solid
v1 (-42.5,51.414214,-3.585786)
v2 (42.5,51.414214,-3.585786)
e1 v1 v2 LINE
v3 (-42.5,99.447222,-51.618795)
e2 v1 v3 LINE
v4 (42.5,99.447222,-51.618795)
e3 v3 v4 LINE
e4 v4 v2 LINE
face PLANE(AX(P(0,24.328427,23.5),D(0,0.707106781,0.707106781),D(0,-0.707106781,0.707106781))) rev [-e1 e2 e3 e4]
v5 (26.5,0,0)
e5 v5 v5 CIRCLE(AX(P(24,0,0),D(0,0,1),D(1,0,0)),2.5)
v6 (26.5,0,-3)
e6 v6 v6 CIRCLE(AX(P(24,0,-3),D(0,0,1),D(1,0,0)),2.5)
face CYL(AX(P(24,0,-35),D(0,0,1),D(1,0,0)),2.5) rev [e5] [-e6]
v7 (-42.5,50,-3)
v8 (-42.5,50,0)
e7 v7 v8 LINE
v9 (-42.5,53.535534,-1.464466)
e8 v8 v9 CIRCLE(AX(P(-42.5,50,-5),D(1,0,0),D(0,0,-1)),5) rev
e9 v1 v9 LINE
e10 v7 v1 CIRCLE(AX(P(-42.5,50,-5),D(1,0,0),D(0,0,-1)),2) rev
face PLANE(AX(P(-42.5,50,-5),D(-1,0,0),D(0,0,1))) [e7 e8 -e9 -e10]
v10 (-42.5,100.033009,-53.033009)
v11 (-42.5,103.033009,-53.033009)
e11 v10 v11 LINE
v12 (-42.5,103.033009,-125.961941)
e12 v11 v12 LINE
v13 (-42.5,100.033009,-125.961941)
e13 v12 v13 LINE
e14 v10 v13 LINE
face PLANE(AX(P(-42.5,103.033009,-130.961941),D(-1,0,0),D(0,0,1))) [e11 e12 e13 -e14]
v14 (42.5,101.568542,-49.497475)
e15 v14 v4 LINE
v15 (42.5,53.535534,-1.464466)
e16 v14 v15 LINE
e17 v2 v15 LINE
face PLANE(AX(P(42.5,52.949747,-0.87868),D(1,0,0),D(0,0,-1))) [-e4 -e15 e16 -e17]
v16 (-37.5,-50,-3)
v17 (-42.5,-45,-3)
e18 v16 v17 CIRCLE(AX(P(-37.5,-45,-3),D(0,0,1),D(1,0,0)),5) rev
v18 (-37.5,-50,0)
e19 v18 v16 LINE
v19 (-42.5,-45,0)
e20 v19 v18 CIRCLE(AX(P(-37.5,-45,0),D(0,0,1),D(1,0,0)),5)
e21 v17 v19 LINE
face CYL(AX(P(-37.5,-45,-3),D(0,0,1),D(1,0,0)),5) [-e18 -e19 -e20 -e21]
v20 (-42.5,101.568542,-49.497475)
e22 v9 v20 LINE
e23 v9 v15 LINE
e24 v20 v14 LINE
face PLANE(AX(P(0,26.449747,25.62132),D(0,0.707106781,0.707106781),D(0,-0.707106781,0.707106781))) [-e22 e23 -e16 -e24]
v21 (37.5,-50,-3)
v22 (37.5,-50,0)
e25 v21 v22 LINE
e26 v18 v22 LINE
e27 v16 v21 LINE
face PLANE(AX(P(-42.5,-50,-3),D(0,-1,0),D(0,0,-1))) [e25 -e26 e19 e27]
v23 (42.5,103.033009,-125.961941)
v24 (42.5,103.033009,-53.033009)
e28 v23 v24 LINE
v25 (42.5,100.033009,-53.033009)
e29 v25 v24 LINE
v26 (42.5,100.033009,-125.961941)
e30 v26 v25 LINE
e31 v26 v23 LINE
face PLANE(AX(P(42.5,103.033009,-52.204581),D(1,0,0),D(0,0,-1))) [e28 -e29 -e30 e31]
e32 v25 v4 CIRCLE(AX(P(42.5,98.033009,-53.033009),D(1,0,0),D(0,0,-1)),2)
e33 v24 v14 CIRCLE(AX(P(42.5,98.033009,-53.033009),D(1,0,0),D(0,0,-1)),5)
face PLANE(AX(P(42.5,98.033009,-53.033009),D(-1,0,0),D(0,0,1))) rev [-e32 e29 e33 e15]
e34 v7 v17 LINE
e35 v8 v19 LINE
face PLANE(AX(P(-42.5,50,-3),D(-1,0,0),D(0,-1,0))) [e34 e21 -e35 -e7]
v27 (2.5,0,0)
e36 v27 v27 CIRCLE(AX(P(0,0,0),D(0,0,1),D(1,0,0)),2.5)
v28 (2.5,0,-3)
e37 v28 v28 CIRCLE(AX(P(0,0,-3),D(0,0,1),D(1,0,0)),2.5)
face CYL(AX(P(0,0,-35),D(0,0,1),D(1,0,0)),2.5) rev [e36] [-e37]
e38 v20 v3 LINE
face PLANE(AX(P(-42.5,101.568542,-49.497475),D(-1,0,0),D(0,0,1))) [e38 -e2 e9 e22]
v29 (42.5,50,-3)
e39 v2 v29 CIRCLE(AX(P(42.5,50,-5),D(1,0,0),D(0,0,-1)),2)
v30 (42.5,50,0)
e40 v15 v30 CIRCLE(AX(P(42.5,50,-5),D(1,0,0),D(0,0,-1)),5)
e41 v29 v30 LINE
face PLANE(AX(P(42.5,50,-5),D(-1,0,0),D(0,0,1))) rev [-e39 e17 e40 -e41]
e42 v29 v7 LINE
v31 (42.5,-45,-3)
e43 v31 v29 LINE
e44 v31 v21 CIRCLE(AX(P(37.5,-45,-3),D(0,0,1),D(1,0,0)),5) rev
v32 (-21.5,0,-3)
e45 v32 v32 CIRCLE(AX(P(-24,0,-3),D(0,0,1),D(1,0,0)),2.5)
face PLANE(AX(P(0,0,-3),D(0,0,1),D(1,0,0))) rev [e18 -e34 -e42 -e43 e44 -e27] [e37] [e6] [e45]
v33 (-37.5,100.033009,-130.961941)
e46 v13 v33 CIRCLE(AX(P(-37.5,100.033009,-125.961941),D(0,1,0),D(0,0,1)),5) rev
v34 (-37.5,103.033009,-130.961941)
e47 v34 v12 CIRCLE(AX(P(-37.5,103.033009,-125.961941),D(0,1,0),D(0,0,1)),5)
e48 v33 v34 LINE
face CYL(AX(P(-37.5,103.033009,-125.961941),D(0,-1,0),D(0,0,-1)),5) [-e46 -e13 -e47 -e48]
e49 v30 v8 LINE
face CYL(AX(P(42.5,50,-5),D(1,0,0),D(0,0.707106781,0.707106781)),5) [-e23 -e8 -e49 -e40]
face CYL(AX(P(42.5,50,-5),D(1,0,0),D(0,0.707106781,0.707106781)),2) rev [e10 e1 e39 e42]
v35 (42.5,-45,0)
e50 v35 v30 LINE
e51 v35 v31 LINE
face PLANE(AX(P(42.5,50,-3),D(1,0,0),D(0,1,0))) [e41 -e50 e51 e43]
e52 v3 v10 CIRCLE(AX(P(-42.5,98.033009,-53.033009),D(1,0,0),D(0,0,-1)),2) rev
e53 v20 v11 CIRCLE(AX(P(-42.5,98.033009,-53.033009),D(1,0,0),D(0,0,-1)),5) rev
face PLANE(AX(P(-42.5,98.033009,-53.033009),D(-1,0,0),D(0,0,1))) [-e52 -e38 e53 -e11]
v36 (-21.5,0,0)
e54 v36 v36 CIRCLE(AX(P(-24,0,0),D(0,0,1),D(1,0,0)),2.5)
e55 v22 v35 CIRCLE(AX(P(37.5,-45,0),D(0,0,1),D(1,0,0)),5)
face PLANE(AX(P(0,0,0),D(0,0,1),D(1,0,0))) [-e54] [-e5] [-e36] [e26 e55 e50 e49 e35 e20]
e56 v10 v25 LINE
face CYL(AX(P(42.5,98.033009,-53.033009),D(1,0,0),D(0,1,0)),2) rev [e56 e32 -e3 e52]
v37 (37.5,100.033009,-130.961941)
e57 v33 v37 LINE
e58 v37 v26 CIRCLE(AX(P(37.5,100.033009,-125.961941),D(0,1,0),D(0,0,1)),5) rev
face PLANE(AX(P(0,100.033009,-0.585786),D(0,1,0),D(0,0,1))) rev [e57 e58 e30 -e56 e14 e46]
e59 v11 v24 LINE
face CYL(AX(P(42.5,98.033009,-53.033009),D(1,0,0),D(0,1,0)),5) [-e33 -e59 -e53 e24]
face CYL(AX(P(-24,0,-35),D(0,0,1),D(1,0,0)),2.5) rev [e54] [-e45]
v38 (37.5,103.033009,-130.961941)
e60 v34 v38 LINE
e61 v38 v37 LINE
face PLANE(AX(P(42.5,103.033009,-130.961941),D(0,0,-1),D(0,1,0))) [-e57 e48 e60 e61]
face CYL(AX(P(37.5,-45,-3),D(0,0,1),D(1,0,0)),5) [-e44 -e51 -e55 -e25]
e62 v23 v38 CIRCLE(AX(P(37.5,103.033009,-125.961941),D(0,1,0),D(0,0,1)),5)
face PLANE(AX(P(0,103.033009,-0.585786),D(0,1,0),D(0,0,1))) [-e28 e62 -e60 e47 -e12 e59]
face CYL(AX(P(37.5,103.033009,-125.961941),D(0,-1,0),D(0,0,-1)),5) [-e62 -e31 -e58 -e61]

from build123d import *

# Parameters (mm, degrees)
CROQUIS1_W             = 85
CROQUIS1_H             = 100
BRIDA_BASE3_DEPTH      = 3
BRIDA_DE_ARISTA1_DEPTH = 85
CROQUIS21_R            = 2.5
CORTAR_EXTRUIR3_DEPTH  = 35
REDONDEO3_R            = 5
REDONDEO4_R            = 5
BRIDA_DE_ARISTA2_DEPTH = 85
REDONDEO5_R            = 5


# Sheet-metal steps are written as plain solids
with BuildPart() as part:
    # Croquis1 → Brida base3 (new body)
    with BuildSketch(Plane.XY):
        Rectangle(CROQUIS1_W, CROQUIS1_H)
    extrude(amount=-BRIDA_BASE3_DEPTH)

    # Brida de arista1 section (across the edge) → Brida de arista1 (add)
    with BuildSketch(Plane(origin=(-42.5, 50.828427125, -3), x_dir=(0, -0.7071067811865438, -0.7071067811865512), z_dir=(1, 0, 0))):
        with BuildLine():
            Line((-3, 0.828427125), (-3, 68.757359313))
            Line((-3, 68.757359313), (0, 68.757359313))
            Line((0, 68.757359313), (0, 0.828427125))
            ThreePointArc((0, 0.828427125), (0.152240935, 0.06306026), (0.585786438, -0.585786438))
            Line((0.585786438, -0.585786438), (-1.535533906, -2.707106781))
            ThreePointArc((-1.535533906, -2.707106781), (-2.619397663, -1.084990037), (-3, 0.828427125))
        make_face()
    extrude(amount=BRIDA_DE_ARISTA1_DEPTH)

    # Croquis21 → Cortar-Extruir3 (cut)
    with BuildSketch(Plane.XY):
        Circle(CROQUIS21_R)
        with Locations((24, 0)):
            Circle(CROQUIS21_R)
        with Locations((-24, 0)):
            Circle(CROQUIS21_R)
    extrude(amount=-CORTAR_EXTRUIR3_DEPTH, mode=Mode.SUBTRACT)

    # Redondeo3
    redondeo3_edges = [part.edges().sort_by_distance(p)[0] for p in [
        (42.5, -50, -1.5),
    ]]
    fillet(redondeo3_edges, radius=REDONDEO3_R)

    # Redondeo4
    redondeo4_edges = [part.edges().sort_by_distance(p)[0] for p in [
        (-42.5, -50, -1.5),
    ]]
    fillet(redondeo4_edges, radius=REDONDEO4_R)

    # Brida de arista2 section (across the edge) → Brida de arista2 (add)
    with BuildSketch(Plane(origin=(-42.5, 100.033008589, -52.204581464), x_dir=(0, -1, 0), z_dir=(1, 0, 0))):
        with BuildLine():
            Line((-3, 0.828427125), (-3, 78.757359313))
            Line((-3, 78.757359313), (0, 78.757359313))
            Line((0, 78.757359313), (0, 0.828427125))
            ThreePointArc((0, 0.828427125), (0.152240935, 0.06306026), (0.585786438, -0.585786438))
            Line((0.585786438, -0.585786438), (-1.535533906, -2.707106781))
            ThreePointArc((-1.535533906, -2.707106781), (-2.619397663, -1.084990037), (-3, 0.828427125))
        make_face()
    extrude(amount=BRIDA_DE_ARISTA2_DEPTH)

    # Redondeo5
    redondeo5_edges = [part.edges().sort_by_distance(p)[0] for p in [
        (-42.5, 101.533008589, -130.961940777),
        (42.5, 101.533008589, -130.961940777),
    ]]
    fillet(redondeo5_edges, radius=REDONDEO5_R)


solid = part.part
